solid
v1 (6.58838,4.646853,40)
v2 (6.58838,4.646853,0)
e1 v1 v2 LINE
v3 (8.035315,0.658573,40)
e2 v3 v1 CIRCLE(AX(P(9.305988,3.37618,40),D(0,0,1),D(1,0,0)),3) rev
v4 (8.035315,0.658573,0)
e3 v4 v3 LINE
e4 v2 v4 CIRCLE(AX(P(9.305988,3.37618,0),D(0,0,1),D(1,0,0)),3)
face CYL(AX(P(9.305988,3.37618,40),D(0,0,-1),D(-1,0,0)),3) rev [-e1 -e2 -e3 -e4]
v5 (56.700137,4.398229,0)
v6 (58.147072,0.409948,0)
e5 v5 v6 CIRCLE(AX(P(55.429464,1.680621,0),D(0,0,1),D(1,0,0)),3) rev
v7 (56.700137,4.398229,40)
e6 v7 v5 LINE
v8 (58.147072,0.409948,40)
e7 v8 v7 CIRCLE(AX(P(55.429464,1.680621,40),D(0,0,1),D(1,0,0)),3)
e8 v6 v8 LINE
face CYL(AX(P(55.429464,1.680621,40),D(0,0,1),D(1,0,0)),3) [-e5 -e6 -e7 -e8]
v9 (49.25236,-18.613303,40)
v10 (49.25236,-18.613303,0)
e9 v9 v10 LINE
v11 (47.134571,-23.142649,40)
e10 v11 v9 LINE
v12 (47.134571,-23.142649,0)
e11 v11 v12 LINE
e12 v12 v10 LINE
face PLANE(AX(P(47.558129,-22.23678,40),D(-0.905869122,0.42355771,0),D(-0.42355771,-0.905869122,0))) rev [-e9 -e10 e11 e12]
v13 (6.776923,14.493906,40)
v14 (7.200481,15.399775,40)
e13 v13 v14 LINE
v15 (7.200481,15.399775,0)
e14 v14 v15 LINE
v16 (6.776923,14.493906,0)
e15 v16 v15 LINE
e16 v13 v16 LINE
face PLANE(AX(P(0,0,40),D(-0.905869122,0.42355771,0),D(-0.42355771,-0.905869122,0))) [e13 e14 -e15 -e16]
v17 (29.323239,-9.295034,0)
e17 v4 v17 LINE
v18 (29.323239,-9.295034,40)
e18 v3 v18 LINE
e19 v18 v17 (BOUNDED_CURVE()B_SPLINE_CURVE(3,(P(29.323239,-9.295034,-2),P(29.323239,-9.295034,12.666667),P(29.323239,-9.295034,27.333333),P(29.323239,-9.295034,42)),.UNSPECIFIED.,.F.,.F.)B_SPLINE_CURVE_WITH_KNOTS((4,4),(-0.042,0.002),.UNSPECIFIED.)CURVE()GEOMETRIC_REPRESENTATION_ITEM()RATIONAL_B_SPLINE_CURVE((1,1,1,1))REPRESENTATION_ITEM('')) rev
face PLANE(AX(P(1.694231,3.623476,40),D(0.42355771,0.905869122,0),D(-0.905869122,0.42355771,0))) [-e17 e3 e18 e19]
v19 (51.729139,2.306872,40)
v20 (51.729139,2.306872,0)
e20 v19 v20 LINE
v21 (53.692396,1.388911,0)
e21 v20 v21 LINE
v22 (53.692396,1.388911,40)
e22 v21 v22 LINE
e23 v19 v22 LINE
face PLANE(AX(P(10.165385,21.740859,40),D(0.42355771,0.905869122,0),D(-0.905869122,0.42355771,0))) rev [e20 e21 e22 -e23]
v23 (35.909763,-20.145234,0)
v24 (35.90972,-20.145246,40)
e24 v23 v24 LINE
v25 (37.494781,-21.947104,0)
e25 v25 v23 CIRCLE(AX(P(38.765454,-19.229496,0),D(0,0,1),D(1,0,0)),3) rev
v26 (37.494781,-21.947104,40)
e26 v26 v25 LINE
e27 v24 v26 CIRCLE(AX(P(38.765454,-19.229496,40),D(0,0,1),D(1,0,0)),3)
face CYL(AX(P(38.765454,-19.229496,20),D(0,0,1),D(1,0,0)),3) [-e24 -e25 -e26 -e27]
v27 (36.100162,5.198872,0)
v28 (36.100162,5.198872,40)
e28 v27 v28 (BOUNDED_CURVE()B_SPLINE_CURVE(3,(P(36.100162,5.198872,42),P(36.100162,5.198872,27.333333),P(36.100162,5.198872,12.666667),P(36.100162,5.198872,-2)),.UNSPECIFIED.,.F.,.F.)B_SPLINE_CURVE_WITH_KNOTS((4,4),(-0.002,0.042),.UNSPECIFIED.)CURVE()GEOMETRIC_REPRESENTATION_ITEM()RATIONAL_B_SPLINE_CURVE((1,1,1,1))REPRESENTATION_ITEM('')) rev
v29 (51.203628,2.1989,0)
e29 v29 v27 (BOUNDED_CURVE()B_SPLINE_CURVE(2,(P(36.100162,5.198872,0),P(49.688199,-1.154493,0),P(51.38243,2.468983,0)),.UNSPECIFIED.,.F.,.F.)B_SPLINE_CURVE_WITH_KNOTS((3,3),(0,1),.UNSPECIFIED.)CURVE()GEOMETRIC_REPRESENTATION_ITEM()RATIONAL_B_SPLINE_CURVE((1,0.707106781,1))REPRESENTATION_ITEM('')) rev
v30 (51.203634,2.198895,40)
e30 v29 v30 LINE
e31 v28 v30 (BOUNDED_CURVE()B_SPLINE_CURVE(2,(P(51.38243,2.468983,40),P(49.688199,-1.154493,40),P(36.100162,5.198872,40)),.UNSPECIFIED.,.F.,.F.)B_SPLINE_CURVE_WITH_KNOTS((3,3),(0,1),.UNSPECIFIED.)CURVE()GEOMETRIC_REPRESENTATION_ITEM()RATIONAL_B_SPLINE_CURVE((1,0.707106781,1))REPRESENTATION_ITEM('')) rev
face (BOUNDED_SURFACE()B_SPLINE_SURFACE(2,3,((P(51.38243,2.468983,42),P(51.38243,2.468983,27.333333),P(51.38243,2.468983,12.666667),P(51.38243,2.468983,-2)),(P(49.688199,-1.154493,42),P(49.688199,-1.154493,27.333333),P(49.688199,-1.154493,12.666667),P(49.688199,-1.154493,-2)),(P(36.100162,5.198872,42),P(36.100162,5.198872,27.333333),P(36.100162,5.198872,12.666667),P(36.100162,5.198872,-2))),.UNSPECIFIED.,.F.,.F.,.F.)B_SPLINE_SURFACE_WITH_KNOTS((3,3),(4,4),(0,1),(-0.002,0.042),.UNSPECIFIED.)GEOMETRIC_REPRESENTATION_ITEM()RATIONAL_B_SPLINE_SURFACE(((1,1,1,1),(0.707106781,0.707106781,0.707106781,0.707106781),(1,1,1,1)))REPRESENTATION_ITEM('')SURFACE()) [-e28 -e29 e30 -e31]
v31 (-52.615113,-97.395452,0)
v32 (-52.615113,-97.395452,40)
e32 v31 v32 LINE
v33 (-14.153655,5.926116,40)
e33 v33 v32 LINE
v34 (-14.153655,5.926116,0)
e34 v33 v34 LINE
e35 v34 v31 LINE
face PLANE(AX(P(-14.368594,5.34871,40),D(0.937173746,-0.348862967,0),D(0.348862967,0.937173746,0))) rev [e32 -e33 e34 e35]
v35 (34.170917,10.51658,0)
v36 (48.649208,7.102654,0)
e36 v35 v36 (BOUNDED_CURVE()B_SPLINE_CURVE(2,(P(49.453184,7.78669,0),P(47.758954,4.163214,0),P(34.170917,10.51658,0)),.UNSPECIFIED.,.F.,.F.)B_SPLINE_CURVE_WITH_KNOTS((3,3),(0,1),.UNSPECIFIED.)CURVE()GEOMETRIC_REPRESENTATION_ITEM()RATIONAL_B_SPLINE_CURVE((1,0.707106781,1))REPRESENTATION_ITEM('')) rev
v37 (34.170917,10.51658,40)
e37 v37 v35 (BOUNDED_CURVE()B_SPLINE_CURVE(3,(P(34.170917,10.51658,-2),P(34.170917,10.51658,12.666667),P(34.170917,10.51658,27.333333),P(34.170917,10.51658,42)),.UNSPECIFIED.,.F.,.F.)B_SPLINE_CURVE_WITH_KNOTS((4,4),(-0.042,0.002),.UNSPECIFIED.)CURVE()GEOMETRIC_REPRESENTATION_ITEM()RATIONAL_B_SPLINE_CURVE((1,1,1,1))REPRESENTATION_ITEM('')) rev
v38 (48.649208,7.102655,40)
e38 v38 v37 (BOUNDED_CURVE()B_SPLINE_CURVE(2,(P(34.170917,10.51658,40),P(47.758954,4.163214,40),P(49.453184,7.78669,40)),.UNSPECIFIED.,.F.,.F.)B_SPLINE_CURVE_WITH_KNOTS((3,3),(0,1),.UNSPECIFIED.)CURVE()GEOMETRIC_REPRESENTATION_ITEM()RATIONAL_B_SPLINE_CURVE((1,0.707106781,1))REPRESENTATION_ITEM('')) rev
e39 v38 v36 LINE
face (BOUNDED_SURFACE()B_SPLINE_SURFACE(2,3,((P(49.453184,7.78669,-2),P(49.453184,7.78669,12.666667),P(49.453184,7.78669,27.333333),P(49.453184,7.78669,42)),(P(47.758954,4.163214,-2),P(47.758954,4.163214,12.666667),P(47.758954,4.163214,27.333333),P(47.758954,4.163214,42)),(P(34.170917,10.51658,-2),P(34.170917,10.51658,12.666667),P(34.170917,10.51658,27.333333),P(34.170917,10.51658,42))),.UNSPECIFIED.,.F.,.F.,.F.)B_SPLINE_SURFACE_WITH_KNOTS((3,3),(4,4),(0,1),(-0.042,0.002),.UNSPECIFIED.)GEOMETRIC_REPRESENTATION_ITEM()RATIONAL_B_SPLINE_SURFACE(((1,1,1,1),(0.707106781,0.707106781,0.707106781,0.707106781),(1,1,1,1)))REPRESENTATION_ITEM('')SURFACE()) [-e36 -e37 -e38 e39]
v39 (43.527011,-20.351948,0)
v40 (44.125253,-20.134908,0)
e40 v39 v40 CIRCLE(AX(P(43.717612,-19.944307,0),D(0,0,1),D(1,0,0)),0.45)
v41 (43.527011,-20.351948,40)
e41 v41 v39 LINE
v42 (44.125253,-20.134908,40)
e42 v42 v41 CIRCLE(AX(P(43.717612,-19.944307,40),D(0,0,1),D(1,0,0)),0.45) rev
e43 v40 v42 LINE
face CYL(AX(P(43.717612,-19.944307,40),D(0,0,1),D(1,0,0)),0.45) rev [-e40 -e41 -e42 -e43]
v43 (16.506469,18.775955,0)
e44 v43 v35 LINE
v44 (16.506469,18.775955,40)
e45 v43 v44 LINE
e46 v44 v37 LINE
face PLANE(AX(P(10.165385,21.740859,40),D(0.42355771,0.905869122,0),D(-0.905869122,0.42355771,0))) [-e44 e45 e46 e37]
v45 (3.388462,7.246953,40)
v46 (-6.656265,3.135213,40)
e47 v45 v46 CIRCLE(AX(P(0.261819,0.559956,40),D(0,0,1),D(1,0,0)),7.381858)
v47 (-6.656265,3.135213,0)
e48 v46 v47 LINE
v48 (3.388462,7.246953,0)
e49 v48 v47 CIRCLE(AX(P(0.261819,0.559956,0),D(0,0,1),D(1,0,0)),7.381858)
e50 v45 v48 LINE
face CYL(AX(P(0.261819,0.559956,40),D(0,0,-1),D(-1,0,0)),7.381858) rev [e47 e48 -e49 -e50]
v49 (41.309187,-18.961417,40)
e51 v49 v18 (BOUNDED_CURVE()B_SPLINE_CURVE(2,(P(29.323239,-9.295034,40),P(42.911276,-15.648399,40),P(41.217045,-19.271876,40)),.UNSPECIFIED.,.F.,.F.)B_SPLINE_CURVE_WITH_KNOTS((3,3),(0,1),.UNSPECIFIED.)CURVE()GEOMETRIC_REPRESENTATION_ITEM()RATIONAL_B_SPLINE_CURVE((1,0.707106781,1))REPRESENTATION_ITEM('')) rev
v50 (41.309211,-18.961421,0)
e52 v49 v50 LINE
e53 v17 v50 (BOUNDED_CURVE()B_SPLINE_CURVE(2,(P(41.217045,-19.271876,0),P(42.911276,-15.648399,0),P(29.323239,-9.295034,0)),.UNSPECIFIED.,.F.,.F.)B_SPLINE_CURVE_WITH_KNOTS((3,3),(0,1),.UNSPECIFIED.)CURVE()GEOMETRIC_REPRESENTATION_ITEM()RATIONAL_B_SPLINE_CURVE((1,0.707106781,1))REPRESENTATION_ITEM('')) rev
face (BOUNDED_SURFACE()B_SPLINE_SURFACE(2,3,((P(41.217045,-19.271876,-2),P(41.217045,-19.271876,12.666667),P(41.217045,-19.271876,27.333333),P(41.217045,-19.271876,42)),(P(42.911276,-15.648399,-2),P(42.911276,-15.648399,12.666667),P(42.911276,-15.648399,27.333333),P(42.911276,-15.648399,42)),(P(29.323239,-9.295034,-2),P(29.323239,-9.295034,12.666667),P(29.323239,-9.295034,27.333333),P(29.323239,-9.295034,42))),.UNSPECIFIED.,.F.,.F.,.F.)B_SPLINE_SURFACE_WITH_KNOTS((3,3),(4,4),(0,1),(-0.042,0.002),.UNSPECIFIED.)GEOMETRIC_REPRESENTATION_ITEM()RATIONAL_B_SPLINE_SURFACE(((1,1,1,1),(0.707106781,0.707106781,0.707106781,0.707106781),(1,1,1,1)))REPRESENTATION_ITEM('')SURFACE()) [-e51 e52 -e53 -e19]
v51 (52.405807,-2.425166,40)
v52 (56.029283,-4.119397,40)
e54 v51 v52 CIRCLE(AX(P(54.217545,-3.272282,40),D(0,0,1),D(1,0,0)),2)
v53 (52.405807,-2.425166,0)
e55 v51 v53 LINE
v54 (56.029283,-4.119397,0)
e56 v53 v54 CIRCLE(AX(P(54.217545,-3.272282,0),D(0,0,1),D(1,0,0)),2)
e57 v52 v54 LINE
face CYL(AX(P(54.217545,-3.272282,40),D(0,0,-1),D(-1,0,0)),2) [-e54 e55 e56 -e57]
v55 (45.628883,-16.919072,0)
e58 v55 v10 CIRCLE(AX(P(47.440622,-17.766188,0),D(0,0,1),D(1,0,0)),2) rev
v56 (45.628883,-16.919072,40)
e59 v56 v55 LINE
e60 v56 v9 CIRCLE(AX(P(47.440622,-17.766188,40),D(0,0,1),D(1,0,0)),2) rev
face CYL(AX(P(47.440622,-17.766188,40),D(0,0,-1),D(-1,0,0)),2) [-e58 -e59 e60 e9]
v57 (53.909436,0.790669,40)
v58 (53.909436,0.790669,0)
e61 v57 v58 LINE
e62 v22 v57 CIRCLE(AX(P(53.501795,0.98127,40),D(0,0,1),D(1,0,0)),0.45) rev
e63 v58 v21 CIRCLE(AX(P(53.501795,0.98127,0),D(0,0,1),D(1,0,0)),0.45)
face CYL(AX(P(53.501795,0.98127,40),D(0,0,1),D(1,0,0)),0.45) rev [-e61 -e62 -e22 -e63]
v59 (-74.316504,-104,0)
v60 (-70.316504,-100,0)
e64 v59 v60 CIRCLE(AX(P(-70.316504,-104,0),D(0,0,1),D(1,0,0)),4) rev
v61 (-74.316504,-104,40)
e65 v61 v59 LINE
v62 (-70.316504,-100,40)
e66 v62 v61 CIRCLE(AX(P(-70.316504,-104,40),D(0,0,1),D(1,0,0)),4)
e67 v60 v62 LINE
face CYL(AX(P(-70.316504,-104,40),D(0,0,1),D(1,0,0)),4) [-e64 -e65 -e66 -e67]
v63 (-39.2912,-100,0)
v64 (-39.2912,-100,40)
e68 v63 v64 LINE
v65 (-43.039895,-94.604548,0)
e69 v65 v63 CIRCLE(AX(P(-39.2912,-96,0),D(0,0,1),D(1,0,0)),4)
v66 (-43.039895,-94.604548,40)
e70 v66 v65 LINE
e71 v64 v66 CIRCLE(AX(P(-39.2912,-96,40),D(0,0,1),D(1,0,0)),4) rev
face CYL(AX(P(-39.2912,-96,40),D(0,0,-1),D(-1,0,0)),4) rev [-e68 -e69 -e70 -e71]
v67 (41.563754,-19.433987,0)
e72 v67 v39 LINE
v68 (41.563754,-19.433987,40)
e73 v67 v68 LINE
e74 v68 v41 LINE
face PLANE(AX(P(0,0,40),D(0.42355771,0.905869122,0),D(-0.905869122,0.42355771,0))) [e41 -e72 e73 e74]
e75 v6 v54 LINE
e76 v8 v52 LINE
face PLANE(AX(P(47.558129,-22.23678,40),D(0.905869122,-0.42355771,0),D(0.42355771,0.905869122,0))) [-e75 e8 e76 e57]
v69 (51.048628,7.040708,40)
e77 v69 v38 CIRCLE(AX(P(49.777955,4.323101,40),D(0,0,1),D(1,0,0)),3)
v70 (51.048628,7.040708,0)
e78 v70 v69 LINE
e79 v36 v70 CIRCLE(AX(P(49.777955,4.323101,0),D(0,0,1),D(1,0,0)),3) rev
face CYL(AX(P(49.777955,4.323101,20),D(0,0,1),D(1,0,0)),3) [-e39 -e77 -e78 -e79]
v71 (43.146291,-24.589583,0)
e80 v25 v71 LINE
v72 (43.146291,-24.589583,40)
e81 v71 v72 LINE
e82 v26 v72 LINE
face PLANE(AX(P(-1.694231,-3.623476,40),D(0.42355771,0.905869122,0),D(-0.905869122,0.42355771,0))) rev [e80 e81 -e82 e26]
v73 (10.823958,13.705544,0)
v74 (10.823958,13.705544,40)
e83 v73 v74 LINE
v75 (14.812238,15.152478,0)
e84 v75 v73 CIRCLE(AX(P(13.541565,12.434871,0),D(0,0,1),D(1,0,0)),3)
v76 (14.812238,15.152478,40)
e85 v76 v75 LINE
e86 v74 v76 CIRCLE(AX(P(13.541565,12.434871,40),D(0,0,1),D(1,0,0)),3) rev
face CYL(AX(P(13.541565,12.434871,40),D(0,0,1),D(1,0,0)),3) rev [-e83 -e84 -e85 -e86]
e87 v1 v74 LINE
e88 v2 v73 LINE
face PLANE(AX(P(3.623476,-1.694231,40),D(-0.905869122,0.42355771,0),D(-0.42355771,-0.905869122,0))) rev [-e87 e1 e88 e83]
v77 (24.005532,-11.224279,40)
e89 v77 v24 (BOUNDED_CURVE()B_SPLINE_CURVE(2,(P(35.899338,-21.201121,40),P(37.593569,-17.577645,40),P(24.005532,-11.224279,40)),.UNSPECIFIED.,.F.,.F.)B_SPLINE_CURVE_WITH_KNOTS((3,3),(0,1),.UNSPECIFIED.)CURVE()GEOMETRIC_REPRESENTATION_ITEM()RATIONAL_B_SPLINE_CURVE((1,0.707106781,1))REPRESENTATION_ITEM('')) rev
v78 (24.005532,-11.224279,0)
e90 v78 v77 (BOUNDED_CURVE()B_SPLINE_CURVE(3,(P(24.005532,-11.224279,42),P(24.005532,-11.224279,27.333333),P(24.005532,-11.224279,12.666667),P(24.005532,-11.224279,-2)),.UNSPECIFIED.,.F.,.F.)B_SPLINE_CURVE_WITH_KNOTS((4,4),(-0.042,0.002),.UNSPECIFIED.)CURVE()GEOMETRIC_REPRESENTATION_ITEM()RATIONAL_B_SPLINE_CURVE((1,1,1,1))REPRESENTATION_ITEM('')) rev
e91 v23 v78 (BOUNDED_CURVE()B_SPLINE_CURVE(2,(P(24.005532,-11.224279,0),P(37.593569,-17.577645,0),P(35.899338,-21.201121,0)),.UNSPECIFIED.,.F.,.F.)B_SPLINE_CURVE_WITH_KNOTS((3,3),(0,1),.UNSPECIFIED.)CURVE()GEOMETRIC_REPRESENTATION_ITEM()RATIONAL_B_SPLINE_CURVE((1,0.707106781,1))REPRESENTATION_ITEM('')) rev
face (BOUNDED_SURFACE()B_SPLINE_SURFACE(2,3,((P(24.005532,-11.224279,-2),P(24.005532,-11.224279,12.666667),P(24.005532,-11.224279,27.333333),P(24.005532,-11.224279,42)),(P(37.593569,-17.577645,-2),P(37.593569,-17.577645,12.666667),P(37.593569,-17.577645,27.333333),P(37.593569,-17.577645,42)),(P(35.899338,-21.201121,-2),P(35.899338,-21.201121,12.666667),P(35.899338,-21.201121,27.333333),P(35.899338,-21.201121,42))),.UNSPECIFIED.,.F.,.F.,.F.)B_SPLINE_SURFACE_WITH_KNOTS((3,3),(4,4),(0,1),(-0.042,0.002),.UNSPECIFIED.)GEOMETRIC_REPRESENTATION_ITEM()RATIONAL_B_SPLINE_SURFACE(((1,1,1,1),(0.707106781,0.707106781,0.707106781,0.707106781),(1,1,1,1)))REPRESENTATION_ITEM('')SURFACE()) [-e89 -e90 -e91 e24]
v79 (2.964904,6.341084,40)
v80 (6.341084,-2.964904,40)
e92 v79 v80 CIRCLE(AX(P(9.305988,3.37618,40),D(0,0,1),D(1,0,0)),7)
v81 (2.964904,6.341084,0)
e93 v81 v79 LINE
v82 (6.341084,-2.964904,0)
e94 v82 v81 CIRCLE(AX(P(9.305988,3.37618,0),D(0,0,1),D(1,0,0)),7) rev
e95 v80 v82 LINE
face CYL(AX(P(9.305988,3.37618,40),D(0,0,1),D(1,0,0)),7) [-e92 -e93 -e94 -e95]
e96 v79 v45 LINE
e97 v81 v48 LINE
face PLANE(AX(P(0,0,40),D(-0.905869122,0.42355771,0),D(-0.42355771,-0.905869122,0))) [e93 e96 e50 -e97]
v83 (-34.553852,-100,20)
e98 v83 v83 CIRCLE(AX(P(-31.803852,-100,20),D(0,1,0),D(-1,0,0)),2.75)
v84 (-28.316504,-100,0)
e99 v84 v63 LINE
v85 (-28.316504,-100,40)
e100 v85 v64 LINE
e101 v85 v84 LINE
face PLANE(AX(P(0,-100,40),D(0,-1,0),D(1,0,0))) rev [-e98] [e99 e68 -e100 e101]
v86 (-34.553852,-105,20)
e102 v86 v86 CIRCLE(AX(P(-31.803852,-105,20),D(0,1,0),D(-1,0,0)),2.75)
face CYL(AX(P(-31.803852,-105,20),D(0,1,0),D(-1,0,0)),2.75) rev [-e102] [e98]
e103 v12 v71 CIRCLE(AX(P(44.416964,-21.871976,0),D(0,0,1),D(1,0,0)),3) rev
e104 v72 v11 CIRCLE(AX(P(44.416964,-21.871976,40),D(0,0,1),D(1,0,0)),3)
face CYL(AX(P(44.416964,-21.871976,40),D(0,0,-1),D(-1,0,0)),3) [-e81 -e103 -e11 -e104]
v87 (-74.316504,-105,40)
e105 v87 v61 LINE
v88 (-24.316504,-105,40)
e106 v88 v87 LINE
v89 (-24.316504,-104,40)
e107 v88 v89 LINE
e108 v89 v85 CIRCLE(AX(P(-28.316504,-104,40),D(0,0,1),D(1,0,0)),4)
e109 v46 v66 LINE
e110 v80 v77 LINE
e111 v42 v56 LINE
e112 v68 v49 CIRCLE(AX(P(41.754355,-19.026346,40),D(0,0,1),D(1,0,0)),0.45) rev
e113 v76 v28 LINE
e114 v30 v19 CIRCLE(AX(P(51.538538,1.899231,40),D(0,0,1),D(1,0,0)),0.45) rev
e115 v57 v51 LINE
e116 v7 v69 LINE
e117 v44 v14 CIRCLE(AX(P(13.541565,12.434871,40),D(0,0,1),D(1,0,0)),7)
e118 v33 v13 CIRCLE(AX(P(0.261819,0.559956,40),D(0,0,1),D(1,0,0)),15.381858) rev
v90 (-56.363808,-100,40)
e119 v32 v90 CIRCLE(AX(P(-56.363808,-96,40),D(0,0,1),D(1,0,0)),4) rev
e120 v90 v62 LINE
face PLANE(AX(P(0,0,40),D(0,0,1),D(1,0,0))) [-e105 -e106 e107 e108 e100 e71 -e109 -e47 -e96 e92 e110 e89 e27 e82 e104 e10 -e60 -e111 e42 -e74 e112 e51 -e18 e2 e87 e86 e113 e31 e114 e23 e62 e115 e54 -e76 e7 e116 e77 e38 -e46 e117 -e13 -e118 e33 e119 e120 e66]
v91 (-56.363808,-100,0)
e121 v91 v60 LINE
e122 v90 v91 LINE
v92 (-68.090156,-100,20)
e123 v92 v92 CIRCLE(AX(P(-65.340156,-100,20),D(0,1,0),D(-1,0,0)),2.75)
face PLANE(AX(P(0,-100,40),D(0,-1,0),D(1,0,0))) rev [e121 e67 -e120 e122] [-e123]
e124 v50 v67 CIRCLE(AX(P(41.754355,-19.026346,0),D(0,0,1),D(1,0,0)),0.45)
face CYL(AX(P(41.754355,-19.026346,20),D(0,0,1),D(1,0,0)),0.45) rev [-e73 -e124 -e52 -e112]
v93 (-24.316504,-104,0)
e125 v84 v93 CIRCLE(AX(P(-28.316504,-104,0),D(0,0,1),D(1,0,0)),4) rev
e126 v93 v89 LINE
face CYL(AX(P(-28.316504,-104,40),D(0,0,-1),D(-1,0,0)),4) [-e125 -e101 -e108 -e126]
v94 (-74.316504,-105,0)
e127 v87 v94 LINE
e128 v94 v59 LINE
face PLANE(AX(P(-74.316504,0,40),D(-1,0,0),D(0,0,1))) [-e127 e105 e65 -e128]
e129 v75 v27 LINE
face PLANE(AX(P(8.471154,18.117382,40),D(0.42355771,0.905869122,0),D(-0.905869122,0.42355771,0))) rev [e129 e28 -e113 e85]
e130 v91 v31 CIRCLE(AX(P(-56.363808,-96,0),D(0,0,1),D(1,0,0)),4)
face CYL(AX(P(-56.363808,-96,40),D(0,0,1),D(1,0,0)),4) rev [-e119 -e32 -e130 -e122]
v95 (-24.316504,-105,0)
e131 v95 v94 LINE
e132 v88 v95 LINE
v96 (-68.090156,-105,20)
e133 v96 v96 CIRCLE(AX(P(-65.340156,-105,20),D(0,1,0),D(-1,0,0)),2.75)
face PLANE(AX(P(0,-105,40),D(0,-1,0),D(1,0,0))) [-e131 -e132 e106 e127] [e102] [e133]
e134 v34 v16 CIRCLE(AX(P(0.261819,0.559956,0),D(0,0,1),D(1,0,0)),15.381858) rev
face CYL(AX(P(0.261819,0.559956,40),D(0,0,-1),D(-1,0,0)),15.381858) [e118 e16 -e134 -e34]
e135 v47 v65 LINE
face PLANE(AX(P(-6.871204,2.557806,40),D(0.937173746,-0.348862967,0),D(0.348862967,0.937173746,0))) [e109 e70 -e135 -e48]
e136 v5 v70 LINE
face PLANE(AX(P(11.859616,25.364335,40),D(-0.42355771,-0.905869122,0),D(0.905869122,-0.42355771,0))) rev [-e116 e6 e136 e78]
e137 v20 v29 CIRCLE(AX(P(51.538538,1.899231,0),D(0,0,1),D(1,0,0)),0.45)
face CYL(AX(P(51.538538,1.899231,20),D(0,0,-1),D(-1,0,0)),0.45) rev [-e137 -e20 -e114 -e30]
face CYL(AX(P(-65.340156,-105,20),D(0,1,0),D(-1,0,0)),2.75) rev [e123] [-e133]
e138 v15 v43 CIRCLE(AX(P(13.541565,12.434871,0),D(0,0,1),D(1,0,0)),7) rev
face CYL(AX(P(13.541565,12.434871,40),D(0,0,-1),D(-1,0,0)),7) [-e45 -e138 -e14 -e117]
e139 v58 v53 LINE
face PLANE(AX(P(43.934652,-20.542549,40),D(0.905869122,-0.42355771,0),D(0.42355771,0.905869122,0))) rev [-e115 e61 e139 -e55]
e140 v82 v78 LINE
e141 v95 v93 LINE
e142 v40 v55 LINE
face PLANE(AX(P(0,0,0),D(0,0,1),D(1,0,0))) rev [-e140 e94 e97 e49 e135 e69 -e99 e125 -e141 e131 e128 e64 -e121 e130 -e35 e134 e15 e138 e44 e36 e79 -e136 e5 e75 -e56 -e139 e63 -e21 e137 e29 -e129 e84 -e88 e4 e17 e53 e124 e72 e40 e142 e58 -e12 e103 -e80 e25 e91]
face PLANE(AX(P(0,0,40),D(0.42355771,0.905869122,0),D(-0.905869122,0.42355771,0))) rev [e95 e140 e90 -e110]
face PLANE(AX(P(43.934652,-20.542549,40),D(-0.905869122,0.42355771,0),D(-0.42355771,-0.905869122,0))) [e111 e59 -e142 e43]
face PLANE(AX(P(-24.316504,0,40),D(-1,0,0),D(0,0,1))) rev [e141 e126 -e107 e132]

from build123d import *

# Parameters (mm, degrees)
BOSS_EXTRUDE1_DEPTH = 40
FILLET1_SIZE        = 15
FILLET1_SIZE_2      = 4
FILLET2_SIZE        = 15
FILLET2_SIZE_2      = 4
FILLET3_SIZE        = 15
FILLET3_SIZE_2      = 4
FILLET4_SIZE        = 15
FILLET4_SIZE_2      = 4
FILLET5_R           = 3
FILLET6_R           = 0.45
FILLET8_R           = 7
FILLET9_R           = 3
FILLET10_R          = 4
CUT_EXTRUDE1_DEPTH  = 147.245106811
FILLET11_R          = 4


with BuildPart() as part:
    # Sketch1 → Boss-Extrude1 (new body)
    with BuildSketch(Plane.XY):
        with BuildLine():
            ThreePointArc((6.77692336, 14.493905953), (-5.565334282, 14.795328723), (-14.153654854, 5.926116291))
            Line((-14.153654854, 5.926116291), (-53.584656115, -100))
            Line((-53.584656115, -100), (-74.316504114, -100))
            Line((-74.316504114, -100), (-74.316504114, -105))
            Line((-74.316504114, -105), (-24.316504114, -105))
            Line((-24.316504114, -105), (-24.316504114, -100))
            Line((-24.316504114, -100), (-45.048352113, -100))
            Line((-45.048352113, -100), (-6.656264884, 3.135212559))
            ThreePointArc((-6.656264884, 3.135212559), (-2.534671543, 7.39160781), (3.38846168, 7.246952976))
            Line((3.38846168, 7.246952976), (0, 0))
            Line((0, 0), (37.593568565, -17.577644966))
            Line((37.593568565, -17.577644966), (35.899337725, -21.201121454))
            Line((35.899337725, -21.201121454), (45.863898068, -25.860256264))
            Line((45.863898068, -25.860256264), (49.252359748, -18.613303288))
            ThreePointArc((49.252359748, -18.613303288), (48.287736924, -15.954449623), (45.62888326, -16.919072448))
            Line((45.62888326, -16.919072448), (43.93465242, -20.542548936))
            Line((43.93465242, -20.542548936), (41.217045053, -19.271875806))
            Line((41.217045053, -19.271875806), (42.911275893, -15.648399317))
            Line((42.911275893, -15.648399317), (5.317707328, 1.929245648))
            Line((5.317707328, 1.929245648), (12.094630689, 16.423151601))
            Line((12.094630689, 16.423151601), (49.688199254, -1.154493365))
            Line((49.688199254, -1.154493365), (51.382430094, 2.468983124))
            Line((51.382430094, 2.468983124), (54.10003746, 1.198309994))
            Line((54.10003746, 1.198309994), (52.40580662, -2.425166495))
            ThreePointArc((52.40580662, -2.425166495), (53.370429444, -5.084020159), (56.029283108, -4.119397335))
            Line((56.029283108, -4.119397335), (59.417744788, 3.127555642))
            Line((59.417744788, 3.127555642), (49.453184446, 7.786690452))
            Line((49.453184446, 7.786690452), (47.758953606, 4.163213964))
            Line((47.758953606, 4.163213964), (10.16538504, 21.740858929))
            Line((10.16538504, 21.740858929), (6.77692336, 14.493905953))
        make_face()
    extrude(amount=BOSS_EXTRUDE1_DEPTH)

    # Fillet1
    # an asymmetric fillet: 15, 4 mm, written as the material it takes off along each edge
    with BuildSketch(Plane(origin=(49.688199254, -1.154493365, -37.5), x_dir=(-0.9058691220518403, 0.42355771001485515, 0), z_dir=(0, 0, 1))) as fillet1_piece_1:
        with BuildLine():
            Bezier((FILLET1_SIZE, 0), (0, 0), (0, -FILLET1_SIZE_2), weights=[1, 0.707106781, 1])
            Line((0, -FILLET1_SIZE_2), (0, 0))
            Line((0, 0), (FILLET1_SIZE, 0))
        make_face()
    extrude(amount=115, mode=Mode.SUBTRACT)

    # Fillet2
    # an asymmetric fillet: 15, 4 mm, written as the material it adds along each edge
    with BuildSketch(Plane(origin=(47.758953606, 4.163213964, 0), x_dir=(-0.9058691220518406, 0.42355771001485454, 0), z_dir=(0, 0, 1))) as fillet2_piece_1:
        with BuildLine():
            Bezier((FILLET2_SIZE, 0), (0, 0), (0, -FILLET2_SIZE_2), weights=[1, 0.707106781, 1])
            Line((0, -FILLET2_SIZE_2), (0, 0))
            Line((0, 0), (FILLET2_SIZE, 0))
        make_face()
    extrude(amount=40)

    # Fillet3
    # an asymmetric fillet: 15, 4 mm, written as the material it takes off along each edge
    with BuildSketch(Plane(origin=(42.911275893, -15.648399317, -37.5), x_dir=(-0.9058691220518403, 0.4235577100148549, 0), z_dir=(0, 0, 1))) as fillet3_piece_1:
        with BuildLine():
            Bezier((FILLET3_SIZE, 0), (0, 0), (0, FILLET3_SIZE_2), weights=[1, 0.707106781, 1])
            Line((0, FILLET3_SIZE_2), (0, 0))
            Line((0, 0), (FILLET3_SIZE, 0))
        make_face()
    extrude(amount=115, mode=Mode.SUBTRACT)

    # Fillet4
    # an asymmetric fillet: 15, 4 mm, written as the material it adds along each edge
    with BuildSketch(Plane(origin=(37.593568565, -17.577644966, 0), x_dir=(-0.9058691220518404, 0.42355771001485476, 0), z_dir=(0, 0, 1))) as fillet4_piece_1:
        with BuildLine():
            Bezier((FILLET4_SIZE, 0), (0, 0), (0, FILLET4_SIZE_2), weights=[1, 0.707106781, 1])
            Line((0, FILLET4_SIZE_2), (0, 0))
            Line((0, 0), (FILLET4_SIZE, 0))
        make_face()
    extrude(amount=40)

    # Fillet5
    fillet5_edges = [part.edges().sort_by_distance(p)[0] for p in [
        (45.863898068, -25.860256264, 20),
        (59.417744788, 3.127555642, 20),
        (35.899337725, -21.201121454, 20),
        (49.453184446, 7.786690452, 20),
    ]]
    fillet(fillet5_edges, radius=FILLET5_R)

    # Fillet6
    fillet6_edges = [part.edges().sort_by_distance(p)[0] for p in [
        (41.217045053, -19.271875806, 20),
        (43.93465242, -20.542548936, 20),
        (51.382430094, 2.468983124, 20),
        (54.10003746, 1.198309994, 20),
    ]]
    fillet(fillet6_edges, radius=FILLET6_R)

    # Fillet8
    fillet8_edges = [part.edges().sort_by_distance(p)[0] for p in [
        (0, 0, 20),
        (10.16538504, 21.740858929, 20),
    ]]
    fillet(fillet8_edges, radius=FILLET8_R)

    # Fillet9
    fillet9_edges = [part.edges().sort_by_distance(p)[0] for p in [
        (5.317707328, 1.929245648, 20),
        (12.094630689, 16.423151601, 20),
    ]]
    fillet(fillet9_edges, radius=FILLET9_R)

    # Fillet10
    fillet10_edges = [part.edges().sort_by_distance(p)[0] for p in [
        (-45.048352113, -100, 20),
        (-53.584656115, -100, 20),
    ]]
    fillet(fillet10_edges, radius=FILLET10_R)

    # Sketch2 → Cut-Extrude1 (cut, through all)
    with BuildSketch(Plane(origin=(0, -100, 0), x_dir=(1, 0, 0), z_dir=(0, 1, 0))):
        with BuildLine():
            ThreePointArc((-68.09015603, -20), (-65.34015603, -22.75), (-62.59015603, -20))
            Line((-62.59015603, -20), (-68.09015603, -20))
        make_face()
        with BuildLine():
            Line((-68.09015603, -20), (-62.59015603, -20))
            ThreePointArc((-62.59015603, -20), (-65.34015603, -17.25), (-68.09015603, -20))
        make_face()
        with BuildLine():
            ThreePointArc((-34.553852028, -20), (-31.803852028, -22.75), (-29.053852028, -20))
            Line((-29.053852028, -20), (-34.553852028, -20))
        make_face()
        with BuildLine():
            Line((-34.553852028, -20), (-29.053852028, -20))
            ThreePointArc((-29.053852028, -20), (-31.803852028, -17.25), (-34.553852028, -20))
        make_face()
    extrude(amount=-CUT_EXTRUDE1_DEPTH, mode=Mode.SUBTRACT)

    # Fillet11
    fillet11_edges = [part.edges().sort_by_distance(p)[0] for p in [
        (-24.316504114, -100, 20),
        (-74.316504114, -100, 20),
    ]]
    fillet(fillet11_edges, radius=FILLET11_R)


solid = part.part
